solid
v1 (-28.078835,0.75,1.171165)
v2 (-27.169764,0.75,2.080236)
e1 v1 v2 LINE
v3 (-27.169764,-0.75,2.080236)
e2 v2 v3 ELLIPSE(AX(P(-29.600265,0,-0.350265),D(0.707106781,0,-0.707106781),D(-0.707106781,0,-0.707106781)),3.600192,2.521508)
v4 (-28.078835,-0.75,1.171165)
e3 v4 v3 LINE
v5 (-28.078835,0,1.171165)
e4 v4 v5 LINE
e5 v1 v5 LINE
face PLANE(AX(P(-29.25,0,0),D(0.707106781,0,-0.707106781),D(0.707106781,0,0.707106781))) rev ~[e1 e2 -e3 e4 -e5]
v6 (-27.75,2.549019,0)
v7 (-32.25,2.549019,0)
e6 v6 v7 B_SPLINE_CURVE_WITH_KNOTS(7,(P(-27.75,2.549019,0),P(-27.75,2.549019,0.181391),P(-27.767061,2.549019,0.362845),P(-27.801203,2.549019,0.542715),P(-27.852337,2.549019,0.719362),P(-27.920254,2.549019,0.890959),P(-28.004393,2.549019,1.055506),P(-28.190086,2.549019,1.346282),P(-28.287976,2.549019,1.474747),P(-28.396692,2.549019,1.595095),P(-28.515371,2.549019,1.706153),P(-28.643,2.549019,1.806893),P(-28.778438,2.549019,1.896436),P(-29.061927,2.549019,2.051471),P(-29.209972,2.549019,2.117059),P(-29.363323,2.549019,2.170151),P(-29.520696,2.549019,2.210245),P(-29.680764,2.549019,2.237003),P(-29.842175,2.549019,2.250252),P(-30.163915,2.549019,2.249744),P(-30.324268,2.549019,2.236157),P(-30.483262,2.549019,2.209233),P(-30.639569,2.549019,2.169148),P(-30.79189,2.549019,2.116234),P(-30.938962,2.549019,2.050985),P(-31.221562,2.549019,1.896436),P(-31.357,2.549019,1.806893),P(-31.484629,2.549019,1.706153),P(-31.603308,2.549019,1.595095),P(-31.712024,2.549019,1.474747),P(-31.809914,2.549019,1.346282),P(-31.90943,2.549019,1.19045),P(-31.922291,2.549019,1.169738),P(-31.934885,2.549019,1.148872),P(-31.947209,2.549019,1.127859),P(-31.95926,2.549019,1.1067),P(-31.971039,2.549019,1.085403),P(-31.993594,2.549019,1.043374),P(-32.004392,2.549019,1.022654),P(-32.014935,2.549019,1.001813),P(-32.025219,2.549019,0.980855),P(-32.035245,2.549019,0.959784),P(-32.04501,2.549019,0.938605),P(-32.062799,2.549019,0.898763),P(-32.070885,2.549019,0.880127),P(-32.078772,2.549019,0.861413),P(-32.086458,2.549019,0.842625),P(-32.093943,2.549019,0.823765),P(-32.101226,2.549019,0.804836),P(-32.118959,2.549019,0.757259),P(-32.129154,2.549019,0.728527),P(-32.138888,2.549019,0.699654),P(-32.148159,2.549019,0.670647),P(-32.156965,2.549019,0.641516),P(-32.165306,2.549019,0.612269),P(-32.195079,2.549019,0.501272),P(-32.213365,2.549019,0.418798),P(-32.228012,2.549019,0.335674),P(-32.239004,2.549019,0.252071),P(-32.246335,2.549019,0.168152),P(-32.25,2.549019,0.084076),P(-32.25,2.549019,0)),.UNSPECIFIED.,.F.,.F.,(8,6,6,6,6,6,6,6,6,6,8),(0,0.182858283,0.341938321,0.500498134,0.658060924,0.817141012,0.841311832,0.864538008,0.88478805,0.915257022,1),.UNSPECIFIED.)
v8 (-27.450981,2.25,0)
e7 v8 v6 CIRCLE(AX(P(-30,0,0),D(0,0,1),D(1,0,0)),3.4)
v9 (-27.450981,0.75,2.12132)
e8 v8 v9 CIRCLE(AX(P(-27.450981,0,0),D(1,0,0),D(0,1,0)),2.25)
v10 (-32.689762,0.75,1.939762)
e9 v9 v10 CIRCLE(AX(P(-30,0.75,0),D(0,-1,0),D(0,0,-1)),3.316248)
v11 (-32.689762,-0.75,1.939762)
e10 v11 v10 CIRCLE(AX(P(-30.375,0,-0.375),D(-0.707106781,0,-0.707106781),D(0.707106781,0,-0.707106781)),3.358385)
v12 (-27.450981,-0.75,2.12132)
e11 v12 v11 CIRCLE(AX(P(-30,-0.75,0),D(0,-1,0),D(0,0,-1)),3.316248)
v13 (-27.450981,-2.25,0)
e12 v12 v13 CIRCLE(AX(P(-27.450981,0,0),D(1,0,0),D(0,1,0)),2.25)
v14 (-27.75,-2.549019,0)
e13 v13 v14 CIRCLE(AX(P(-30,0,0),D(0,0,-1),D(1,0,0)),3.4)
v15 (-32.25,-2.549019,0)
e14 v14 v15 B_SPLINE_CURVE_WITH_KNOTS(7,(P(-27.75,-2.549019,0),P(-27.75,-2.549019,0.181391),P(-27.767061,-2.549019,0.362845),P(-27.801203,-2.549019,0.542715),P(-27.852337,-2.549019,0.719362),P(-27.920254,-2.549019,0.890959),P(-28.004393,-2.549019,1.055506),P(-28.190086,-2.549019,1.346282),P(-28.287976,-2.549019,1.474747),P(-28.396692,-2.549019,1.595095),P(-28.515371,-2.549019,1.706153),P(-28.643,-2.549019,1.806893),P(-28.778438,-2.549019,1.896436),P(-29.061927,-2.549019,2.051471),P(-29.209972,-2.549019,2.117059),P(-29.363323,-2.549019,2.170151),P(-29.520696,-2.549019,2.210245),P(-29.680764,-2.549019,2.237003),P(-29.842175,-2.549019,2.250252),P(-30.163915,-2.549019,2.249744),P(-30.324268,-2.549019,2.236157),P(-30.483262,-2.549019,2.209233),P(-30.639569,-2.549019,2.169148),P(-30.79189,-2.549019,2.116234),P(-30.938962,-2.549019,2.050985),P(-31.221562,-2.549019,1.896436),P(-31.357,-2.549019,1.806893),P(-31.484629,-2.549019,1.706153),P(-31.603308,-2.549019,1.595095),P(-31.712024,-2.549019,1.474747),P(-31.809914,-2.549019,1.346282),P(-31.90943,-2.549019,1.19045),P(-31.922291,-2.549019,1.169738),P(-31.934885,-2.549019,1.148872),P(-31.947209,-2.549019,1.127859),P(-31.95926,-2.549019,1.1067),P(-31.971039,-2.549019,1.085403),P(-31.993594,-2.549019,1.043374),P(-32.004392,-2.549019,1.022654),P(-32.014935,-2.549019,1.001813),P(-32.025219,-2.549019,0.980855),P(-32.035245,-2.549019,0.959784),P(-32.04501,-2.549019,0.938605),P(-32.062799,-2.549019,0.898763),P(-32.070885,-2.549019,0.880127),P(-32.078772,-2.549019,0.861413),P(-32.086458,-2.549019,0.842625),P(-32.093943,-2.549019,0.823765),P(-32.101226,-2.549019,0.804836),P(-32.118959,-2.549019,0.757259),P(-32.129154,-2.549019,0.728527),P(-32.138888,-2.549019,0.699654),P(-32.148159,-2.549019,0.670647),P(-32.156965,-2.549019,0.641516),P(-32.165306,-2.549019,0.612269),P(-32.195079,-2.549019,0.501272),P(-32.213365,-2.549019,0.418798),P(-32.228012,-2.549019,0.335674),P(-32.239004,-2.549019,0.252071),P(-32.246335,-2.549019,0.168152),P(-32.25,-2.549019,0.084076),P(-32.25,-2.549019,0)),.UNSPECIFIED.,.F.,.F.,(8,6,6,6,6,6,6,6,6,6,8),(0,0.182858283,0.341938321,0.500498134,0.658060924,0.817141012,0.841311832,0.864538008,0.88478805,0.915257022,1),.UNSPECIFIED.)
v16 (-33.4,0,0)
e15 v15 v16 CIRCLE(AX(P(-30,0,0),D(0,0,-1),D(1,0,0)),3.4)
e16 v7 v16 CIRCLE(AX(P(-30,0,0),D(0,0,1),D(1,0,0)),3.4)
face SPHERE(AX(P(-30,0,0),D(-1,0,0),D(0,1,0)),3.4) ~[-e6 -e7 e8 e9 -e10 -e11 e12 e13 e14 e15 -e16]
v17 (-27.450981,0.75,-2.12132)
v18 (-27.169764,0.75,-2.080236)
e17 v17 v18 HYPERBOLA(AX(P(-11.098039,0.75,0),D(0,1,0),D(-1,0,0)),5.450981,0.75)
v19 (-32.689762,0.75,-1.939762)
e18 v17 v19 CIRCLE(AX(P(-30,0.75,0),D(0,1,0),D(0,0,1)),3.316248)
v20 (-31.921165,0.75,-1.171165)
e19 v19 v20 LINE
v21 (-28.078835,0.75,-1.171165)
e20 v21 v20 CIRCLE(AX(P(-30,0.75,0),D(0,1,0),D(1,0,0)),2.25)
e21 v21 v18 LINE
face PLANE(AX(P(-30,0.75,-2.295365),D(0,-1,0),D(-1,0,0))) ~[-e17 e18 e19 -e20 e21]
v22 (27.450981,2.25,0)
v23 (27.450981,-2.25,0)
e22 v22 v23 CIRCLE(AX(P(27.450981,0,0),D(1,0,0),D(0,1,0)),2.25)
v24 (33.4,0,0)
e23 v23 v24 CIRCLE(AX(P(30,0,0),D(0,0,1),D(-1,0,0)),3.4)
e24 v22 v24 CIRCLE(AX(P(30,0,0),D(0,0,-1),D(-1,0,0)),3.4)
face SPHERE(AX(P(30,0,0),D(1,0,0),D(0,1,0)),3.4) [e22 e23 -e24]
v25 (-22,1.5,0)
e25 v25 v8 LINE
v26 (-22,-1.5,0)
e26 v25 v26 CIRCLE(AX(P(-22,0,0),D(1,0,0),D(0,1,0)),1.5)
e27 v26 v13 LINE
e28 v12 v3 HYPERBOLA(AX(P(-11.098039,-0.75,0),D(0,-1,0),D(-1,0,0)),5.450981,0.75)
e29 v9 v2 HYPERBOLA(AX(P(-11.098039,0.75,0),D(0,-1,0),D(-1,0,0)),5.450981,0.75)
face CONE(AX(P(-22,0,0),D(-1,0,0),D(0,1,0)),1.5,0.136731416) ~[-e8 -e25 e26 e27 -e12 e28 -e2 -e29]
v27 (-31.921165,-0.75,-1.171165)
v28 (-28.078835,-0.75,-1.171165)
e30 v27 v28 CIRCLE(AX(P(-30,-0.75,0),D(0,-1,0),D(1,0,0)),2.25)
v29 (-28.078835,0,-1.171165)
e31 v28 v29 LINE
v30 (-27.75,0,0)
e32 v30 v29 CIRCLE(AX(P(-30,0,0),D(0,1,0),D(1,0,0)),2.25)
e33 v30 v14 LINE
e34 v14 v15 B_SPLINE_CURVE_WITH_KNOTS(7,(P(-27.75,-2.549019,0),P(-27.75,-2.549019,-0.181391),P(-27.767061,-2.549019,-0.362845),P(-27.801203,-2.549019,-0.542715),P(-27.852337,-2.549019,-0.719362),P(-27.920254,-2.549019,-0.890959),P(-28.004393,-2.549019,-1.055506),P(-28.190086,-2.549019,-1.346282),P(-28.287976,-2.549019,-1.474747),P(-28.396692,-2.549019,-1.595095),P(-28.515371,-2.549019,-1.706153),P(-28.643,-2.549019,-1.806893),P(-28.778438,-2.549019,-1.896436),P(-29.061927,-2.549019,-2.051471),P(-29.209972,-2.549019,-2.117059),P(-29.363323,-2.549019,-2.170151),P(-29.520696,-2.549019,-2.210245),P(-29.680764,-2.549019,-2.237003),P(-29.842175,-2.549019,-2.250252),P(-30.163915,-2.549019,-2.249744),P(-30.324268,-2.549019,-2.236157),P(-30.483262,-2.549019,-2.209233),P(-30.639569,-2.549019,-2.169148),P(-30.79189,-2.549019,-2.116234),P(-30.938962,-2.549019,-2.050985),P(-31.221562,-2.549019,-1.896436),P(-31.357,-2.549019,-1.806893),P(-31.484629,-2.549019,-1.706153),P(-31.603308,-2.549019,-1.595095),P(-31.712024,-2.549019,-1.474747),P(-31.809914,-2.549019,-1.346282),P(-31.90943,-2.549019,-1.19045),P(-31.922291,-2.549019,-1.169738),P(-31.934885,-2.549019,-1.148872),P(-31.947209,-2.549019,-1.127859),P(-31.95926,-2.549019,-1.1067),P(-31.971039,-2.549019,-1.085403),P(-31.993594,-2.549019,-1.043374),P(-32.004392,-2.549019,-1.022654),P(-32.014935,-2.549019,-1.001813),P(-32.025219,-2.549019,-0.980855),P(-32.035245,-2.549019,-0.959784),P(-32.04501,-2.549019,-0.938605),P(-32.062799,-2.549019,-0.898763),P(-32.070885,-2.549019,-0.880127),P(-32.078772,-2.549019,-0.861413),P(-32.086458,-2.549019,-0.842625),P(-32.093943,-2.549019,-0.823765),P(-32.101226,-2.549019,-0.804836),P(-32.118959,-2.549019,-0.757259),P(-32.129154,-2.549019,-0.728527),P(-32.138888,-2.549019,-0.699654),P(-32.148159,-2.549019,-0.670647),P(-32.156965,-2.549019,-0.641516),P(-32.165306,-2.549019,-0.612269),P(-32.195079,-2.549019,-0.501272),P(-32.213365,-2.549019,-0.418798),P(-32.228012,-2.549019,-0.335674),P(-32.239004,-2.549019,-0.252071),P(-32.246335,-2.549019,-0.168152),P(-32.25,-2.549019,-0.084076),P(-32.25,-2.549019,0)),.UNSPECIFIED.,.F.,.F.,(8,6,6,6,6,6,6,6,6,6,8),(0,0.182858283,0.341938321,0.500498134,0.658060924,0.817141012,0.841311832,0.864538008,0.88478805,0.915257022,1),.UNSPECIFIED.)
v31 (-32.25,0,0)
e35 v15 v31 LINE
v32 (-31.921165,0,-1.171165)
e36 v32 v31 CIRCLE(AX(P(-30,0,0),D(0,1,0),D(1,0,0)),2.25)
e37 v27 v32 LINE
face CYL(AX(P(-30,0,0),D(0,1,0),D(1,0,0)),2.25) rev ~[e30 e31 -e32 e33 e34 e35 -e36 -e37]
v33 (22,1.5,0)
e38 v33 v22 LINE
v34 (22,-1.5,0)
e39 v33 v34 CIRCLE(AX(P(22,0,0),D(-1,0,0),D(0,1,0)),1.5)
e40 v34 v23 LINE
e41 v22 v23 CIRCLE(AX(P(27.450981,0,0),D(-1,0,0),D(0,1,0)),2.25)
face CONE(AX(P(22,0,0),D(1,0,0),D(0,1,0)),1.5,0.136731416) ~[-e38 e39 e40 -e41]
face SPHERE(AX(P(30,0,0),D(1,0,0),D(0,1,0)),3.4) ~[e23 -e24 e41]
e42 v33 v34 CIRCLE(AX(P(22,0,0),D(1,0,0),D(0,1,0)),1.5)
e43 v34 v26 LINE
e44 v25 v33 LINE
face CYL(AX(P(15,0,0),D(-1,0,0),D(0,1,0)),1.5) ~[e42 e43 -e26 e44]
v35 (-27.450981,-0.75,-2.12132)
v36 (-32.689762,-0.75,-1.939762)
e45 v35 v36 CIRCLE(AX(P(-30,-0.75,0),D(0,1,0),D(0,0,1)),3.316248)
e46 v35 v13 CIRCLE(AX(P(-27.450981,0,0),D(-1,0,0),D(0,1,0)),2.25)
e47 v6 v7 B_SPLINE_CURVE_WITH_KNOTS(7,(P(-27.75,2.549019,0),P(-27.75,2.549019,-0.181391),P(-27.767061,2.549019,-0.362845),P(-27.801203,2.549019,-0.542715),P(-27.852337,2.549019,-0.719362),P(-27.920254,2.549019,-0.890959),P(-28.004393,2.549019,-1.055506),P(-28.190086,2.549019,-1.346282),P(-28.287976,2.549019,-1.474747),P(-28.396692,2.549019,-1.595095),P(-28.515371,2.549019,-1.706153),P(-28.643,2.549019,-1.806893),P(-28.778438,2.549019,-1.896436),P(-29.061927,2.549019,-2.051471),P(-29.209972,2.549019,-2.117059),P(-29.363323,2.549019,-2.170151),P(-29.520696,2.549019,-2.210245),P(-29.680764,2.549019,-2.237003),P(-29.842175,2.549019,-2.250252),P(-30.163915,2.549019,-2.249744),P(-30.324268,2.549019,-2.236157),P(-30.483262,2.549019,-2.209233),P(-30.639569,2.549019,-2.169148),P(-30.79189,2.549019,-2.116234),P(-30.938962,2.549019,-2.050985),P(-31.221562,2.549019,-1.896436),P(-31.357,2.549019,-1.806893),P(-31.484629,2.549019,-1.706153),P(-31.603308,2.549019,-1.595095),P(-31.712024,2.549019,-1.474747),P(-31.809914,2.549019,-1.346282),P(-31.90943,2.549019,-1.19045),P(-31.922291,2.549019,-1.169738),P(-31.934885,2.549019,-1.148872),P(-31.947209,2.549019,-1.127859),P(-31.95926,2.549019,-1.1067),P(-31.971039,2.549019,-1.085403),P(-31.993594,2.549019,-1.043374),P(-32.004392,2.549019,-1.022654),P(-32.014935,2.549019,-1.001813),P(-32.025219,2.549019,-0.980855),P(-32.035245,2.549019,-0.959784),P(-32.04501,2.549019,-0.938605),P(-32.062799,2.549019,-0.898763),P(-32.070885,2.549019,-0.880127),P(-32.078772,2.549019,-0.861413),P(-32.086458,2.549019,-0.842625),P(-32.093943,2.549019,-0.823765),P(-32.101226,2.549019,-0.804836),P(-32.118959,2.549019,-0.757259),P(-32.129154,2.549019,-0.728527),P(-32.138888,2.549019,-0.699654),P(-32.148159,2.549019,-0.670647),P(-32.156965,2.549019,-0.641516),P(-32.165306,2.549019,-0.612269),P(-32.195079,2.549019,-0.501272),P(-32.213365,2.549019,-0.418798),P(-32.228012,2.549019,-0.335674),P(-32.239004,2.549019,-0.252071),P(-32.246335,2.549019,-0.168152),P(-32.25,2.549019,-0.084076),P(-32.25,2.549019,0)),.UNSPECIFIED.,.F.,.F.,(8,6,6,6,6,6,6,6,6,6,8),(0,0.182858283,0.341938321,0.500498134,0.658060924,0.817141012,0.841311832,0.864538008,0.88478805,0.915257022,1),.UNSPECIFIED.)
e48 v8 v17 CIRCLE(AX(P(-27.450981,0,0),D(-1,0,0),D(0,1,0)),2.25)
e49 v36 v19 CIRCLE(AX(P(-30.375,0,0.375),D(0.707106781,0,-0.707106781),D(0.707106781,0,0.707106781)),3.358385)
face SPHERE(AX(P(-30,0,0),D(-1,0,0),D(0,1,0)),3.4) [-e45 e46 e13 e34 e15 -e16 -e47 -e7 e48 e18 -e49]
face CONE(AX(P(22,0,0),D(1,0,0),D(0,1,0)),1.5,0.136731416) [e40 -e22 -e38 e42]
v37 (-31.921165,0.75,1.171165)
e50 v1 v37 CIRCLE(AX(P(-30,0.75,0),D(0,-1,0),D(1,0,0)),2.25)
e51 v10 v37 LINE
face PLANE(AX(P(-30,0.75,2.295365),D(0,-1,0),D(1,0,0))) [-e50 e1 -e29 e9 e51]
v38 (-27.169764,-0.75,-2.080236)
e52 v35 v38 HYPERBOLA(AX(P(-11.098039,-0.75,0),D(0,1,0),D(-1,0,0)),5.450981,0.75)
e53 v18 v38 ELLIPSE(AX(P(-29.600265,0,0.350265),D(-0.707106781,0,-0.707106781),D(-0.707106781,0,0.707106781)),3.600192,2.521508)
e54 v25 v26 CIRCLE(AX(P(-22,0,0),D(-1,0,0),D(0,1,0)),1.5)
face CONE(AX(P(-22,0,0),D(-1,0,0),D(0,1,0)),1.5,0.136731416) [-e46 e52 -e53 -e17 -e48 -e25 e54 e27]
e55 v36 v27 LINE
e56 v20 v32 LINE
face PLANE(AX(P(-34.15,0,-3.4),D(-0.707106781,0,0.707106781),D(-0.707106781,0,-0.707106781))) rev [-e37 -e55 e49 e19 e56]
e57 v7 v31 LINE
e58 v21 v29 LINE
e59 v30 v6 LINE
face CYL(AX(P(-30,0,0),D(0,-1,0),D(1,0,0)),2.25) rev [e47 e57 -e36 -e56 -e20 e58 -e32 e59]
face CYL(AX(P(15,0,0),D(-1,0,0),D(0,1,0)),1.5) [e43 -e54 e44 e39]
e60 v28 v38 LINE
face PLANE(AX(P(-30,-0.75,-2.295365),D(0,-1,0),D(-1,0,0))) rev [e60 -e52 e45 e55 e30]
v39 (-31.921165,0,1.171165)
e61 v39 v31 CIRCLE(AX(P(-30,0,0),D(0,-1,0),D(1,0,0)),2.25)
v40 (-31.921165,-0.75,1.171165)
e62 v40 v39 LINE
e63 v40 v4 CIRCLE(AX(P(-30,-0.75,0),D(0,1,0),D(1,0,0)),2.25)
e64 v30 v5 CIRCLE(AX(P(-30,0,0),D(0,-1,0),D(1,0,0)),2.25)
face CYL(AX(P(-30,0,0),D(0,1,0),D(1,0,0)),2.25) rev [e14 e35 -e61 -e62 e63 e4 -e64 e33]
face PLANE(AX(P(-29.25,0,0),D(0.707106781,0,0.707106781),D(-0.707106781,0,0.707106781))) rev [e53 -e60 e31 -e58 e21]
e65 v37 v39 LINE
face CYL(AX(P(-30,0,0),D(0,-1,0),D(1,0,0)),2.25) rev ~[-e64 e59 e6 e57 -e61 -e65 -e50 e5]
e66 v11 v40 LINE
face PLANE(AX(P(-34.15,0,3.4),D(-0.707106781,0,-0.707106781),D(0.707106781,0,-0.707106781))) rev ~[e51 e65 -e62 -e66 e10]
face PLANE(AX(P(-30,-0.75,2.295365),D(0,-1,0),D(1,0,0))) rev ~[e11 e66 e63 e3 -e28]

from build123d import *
from build123d import SkipClean  # not in build123d's __all__

# Parameters (mm, degrees)
F2_W           = 30
F2_H           = 1.5
F3_ANGLE_BACK  = 90
F3_ANGLE       = 180
F5_ANGLE_BACK  = 90
F5_ANGLE       = 180
F7_ANGLE_BACK  = 90
F7_ANGLE       = 180
F9_R           = 2.25
F10_DEPTH      = 3.401
F10_DEPTH_BACK = 3.401
F12_DEPTH      = 0.75


with BuildPart() as f3:
    # F2 (on Front) → F3 (revolve)
    with BuildSketch(Plane.XZ, mode=Mode.PRIVATE) as f3_sk:
        with Locations((-15, 0.75)):
            Rectangle(F2_W, F2_H)
    revolve(f3_sk.sketch.rotate(Axis((0, 0, 0), (1, 0, 0)), -F3_ANGLE_BACK), axis=Axis((0, 0, 0), (1, 0, 0)), revolution_arc=F3_ANGLE)

    # F4 (on Front) → F5 (revolve)
    with BuildSketch(Plane.XZ, mode=Mode.PRIVATE) as f5_sk:
        with BuildLine():
            Line((-33.4, 0), (-26.6, 0))
            ThreePointArc((-26.6, 0), (-30, 3.4), (-33.4, 0))
        make_face()
    revolve(f5_sk.sketch.rotate(Axis((0, 0, 0), (1, 0, 0)), -F5_ANGLE_BACK), axis=Axis((0, 0, 0), (1, 0, 0)), revolution_arc=F5_ANGLE)

    # F6 (on Front) → F7 (revolve)
    with BuildSketch(Plane.XZ, mode=Mode.PRIVATE) as f7_sk:
        Polygon((-27.4509805807, 2.25), (-30, 2.25), (-30, 0), (-22, 0), (-22, 1.5), align=None)
    revolve(f7_sk.sketch.rotate(Axis((0, 0, 0), (1, 0, 0)), -F7_ANGLE_BACK), axis=Axis((0, 0, 0), (1, 0, 0)), revolution_arc=F7_ANGLE)

    # F8: F3 across plane


with BuildPart() as f3_1:
    add(f3.part, clean=False)
    add(f3.part.mirror(Plane.YZ), clean=False)

    # F9 (on Front) → F10 (cut, two sides)
    with BuildSketch(Plane.XZ) as f10_sk:
        with Locations((-30, 0)):
            Circle(F9_R)
    extrude(amount=-F10_DEPTH, mode=Mode.SUBTRACT)
    extrude(f10_sk.sketch, amount=F10_DEPTH_BACK, mode=Mode.SUBTRACT)

    # F11 (on Front) → F12 (cut, symmetric)
    with BuildSketch(Plane.XZ):
        Polygon((-34.15, 3.4), (-30.75, 0), (-29.25, 0), (-25.85, 3.4), align=None)
    extrude(amount=F12_DEPTH, both=True, mode=Mode.SUBTRACT)

    # F13: F3 across plane


with BuildPart() as f3_2:
    add(f3_1.part, clean=False)
    with SkipClean():  # cleaning this boolean's faces spoils the solid; the shape is the same uncleaned
        add(f3_1.part.mirror(Plane.XY), clean=False)


solid = f3_2.part
